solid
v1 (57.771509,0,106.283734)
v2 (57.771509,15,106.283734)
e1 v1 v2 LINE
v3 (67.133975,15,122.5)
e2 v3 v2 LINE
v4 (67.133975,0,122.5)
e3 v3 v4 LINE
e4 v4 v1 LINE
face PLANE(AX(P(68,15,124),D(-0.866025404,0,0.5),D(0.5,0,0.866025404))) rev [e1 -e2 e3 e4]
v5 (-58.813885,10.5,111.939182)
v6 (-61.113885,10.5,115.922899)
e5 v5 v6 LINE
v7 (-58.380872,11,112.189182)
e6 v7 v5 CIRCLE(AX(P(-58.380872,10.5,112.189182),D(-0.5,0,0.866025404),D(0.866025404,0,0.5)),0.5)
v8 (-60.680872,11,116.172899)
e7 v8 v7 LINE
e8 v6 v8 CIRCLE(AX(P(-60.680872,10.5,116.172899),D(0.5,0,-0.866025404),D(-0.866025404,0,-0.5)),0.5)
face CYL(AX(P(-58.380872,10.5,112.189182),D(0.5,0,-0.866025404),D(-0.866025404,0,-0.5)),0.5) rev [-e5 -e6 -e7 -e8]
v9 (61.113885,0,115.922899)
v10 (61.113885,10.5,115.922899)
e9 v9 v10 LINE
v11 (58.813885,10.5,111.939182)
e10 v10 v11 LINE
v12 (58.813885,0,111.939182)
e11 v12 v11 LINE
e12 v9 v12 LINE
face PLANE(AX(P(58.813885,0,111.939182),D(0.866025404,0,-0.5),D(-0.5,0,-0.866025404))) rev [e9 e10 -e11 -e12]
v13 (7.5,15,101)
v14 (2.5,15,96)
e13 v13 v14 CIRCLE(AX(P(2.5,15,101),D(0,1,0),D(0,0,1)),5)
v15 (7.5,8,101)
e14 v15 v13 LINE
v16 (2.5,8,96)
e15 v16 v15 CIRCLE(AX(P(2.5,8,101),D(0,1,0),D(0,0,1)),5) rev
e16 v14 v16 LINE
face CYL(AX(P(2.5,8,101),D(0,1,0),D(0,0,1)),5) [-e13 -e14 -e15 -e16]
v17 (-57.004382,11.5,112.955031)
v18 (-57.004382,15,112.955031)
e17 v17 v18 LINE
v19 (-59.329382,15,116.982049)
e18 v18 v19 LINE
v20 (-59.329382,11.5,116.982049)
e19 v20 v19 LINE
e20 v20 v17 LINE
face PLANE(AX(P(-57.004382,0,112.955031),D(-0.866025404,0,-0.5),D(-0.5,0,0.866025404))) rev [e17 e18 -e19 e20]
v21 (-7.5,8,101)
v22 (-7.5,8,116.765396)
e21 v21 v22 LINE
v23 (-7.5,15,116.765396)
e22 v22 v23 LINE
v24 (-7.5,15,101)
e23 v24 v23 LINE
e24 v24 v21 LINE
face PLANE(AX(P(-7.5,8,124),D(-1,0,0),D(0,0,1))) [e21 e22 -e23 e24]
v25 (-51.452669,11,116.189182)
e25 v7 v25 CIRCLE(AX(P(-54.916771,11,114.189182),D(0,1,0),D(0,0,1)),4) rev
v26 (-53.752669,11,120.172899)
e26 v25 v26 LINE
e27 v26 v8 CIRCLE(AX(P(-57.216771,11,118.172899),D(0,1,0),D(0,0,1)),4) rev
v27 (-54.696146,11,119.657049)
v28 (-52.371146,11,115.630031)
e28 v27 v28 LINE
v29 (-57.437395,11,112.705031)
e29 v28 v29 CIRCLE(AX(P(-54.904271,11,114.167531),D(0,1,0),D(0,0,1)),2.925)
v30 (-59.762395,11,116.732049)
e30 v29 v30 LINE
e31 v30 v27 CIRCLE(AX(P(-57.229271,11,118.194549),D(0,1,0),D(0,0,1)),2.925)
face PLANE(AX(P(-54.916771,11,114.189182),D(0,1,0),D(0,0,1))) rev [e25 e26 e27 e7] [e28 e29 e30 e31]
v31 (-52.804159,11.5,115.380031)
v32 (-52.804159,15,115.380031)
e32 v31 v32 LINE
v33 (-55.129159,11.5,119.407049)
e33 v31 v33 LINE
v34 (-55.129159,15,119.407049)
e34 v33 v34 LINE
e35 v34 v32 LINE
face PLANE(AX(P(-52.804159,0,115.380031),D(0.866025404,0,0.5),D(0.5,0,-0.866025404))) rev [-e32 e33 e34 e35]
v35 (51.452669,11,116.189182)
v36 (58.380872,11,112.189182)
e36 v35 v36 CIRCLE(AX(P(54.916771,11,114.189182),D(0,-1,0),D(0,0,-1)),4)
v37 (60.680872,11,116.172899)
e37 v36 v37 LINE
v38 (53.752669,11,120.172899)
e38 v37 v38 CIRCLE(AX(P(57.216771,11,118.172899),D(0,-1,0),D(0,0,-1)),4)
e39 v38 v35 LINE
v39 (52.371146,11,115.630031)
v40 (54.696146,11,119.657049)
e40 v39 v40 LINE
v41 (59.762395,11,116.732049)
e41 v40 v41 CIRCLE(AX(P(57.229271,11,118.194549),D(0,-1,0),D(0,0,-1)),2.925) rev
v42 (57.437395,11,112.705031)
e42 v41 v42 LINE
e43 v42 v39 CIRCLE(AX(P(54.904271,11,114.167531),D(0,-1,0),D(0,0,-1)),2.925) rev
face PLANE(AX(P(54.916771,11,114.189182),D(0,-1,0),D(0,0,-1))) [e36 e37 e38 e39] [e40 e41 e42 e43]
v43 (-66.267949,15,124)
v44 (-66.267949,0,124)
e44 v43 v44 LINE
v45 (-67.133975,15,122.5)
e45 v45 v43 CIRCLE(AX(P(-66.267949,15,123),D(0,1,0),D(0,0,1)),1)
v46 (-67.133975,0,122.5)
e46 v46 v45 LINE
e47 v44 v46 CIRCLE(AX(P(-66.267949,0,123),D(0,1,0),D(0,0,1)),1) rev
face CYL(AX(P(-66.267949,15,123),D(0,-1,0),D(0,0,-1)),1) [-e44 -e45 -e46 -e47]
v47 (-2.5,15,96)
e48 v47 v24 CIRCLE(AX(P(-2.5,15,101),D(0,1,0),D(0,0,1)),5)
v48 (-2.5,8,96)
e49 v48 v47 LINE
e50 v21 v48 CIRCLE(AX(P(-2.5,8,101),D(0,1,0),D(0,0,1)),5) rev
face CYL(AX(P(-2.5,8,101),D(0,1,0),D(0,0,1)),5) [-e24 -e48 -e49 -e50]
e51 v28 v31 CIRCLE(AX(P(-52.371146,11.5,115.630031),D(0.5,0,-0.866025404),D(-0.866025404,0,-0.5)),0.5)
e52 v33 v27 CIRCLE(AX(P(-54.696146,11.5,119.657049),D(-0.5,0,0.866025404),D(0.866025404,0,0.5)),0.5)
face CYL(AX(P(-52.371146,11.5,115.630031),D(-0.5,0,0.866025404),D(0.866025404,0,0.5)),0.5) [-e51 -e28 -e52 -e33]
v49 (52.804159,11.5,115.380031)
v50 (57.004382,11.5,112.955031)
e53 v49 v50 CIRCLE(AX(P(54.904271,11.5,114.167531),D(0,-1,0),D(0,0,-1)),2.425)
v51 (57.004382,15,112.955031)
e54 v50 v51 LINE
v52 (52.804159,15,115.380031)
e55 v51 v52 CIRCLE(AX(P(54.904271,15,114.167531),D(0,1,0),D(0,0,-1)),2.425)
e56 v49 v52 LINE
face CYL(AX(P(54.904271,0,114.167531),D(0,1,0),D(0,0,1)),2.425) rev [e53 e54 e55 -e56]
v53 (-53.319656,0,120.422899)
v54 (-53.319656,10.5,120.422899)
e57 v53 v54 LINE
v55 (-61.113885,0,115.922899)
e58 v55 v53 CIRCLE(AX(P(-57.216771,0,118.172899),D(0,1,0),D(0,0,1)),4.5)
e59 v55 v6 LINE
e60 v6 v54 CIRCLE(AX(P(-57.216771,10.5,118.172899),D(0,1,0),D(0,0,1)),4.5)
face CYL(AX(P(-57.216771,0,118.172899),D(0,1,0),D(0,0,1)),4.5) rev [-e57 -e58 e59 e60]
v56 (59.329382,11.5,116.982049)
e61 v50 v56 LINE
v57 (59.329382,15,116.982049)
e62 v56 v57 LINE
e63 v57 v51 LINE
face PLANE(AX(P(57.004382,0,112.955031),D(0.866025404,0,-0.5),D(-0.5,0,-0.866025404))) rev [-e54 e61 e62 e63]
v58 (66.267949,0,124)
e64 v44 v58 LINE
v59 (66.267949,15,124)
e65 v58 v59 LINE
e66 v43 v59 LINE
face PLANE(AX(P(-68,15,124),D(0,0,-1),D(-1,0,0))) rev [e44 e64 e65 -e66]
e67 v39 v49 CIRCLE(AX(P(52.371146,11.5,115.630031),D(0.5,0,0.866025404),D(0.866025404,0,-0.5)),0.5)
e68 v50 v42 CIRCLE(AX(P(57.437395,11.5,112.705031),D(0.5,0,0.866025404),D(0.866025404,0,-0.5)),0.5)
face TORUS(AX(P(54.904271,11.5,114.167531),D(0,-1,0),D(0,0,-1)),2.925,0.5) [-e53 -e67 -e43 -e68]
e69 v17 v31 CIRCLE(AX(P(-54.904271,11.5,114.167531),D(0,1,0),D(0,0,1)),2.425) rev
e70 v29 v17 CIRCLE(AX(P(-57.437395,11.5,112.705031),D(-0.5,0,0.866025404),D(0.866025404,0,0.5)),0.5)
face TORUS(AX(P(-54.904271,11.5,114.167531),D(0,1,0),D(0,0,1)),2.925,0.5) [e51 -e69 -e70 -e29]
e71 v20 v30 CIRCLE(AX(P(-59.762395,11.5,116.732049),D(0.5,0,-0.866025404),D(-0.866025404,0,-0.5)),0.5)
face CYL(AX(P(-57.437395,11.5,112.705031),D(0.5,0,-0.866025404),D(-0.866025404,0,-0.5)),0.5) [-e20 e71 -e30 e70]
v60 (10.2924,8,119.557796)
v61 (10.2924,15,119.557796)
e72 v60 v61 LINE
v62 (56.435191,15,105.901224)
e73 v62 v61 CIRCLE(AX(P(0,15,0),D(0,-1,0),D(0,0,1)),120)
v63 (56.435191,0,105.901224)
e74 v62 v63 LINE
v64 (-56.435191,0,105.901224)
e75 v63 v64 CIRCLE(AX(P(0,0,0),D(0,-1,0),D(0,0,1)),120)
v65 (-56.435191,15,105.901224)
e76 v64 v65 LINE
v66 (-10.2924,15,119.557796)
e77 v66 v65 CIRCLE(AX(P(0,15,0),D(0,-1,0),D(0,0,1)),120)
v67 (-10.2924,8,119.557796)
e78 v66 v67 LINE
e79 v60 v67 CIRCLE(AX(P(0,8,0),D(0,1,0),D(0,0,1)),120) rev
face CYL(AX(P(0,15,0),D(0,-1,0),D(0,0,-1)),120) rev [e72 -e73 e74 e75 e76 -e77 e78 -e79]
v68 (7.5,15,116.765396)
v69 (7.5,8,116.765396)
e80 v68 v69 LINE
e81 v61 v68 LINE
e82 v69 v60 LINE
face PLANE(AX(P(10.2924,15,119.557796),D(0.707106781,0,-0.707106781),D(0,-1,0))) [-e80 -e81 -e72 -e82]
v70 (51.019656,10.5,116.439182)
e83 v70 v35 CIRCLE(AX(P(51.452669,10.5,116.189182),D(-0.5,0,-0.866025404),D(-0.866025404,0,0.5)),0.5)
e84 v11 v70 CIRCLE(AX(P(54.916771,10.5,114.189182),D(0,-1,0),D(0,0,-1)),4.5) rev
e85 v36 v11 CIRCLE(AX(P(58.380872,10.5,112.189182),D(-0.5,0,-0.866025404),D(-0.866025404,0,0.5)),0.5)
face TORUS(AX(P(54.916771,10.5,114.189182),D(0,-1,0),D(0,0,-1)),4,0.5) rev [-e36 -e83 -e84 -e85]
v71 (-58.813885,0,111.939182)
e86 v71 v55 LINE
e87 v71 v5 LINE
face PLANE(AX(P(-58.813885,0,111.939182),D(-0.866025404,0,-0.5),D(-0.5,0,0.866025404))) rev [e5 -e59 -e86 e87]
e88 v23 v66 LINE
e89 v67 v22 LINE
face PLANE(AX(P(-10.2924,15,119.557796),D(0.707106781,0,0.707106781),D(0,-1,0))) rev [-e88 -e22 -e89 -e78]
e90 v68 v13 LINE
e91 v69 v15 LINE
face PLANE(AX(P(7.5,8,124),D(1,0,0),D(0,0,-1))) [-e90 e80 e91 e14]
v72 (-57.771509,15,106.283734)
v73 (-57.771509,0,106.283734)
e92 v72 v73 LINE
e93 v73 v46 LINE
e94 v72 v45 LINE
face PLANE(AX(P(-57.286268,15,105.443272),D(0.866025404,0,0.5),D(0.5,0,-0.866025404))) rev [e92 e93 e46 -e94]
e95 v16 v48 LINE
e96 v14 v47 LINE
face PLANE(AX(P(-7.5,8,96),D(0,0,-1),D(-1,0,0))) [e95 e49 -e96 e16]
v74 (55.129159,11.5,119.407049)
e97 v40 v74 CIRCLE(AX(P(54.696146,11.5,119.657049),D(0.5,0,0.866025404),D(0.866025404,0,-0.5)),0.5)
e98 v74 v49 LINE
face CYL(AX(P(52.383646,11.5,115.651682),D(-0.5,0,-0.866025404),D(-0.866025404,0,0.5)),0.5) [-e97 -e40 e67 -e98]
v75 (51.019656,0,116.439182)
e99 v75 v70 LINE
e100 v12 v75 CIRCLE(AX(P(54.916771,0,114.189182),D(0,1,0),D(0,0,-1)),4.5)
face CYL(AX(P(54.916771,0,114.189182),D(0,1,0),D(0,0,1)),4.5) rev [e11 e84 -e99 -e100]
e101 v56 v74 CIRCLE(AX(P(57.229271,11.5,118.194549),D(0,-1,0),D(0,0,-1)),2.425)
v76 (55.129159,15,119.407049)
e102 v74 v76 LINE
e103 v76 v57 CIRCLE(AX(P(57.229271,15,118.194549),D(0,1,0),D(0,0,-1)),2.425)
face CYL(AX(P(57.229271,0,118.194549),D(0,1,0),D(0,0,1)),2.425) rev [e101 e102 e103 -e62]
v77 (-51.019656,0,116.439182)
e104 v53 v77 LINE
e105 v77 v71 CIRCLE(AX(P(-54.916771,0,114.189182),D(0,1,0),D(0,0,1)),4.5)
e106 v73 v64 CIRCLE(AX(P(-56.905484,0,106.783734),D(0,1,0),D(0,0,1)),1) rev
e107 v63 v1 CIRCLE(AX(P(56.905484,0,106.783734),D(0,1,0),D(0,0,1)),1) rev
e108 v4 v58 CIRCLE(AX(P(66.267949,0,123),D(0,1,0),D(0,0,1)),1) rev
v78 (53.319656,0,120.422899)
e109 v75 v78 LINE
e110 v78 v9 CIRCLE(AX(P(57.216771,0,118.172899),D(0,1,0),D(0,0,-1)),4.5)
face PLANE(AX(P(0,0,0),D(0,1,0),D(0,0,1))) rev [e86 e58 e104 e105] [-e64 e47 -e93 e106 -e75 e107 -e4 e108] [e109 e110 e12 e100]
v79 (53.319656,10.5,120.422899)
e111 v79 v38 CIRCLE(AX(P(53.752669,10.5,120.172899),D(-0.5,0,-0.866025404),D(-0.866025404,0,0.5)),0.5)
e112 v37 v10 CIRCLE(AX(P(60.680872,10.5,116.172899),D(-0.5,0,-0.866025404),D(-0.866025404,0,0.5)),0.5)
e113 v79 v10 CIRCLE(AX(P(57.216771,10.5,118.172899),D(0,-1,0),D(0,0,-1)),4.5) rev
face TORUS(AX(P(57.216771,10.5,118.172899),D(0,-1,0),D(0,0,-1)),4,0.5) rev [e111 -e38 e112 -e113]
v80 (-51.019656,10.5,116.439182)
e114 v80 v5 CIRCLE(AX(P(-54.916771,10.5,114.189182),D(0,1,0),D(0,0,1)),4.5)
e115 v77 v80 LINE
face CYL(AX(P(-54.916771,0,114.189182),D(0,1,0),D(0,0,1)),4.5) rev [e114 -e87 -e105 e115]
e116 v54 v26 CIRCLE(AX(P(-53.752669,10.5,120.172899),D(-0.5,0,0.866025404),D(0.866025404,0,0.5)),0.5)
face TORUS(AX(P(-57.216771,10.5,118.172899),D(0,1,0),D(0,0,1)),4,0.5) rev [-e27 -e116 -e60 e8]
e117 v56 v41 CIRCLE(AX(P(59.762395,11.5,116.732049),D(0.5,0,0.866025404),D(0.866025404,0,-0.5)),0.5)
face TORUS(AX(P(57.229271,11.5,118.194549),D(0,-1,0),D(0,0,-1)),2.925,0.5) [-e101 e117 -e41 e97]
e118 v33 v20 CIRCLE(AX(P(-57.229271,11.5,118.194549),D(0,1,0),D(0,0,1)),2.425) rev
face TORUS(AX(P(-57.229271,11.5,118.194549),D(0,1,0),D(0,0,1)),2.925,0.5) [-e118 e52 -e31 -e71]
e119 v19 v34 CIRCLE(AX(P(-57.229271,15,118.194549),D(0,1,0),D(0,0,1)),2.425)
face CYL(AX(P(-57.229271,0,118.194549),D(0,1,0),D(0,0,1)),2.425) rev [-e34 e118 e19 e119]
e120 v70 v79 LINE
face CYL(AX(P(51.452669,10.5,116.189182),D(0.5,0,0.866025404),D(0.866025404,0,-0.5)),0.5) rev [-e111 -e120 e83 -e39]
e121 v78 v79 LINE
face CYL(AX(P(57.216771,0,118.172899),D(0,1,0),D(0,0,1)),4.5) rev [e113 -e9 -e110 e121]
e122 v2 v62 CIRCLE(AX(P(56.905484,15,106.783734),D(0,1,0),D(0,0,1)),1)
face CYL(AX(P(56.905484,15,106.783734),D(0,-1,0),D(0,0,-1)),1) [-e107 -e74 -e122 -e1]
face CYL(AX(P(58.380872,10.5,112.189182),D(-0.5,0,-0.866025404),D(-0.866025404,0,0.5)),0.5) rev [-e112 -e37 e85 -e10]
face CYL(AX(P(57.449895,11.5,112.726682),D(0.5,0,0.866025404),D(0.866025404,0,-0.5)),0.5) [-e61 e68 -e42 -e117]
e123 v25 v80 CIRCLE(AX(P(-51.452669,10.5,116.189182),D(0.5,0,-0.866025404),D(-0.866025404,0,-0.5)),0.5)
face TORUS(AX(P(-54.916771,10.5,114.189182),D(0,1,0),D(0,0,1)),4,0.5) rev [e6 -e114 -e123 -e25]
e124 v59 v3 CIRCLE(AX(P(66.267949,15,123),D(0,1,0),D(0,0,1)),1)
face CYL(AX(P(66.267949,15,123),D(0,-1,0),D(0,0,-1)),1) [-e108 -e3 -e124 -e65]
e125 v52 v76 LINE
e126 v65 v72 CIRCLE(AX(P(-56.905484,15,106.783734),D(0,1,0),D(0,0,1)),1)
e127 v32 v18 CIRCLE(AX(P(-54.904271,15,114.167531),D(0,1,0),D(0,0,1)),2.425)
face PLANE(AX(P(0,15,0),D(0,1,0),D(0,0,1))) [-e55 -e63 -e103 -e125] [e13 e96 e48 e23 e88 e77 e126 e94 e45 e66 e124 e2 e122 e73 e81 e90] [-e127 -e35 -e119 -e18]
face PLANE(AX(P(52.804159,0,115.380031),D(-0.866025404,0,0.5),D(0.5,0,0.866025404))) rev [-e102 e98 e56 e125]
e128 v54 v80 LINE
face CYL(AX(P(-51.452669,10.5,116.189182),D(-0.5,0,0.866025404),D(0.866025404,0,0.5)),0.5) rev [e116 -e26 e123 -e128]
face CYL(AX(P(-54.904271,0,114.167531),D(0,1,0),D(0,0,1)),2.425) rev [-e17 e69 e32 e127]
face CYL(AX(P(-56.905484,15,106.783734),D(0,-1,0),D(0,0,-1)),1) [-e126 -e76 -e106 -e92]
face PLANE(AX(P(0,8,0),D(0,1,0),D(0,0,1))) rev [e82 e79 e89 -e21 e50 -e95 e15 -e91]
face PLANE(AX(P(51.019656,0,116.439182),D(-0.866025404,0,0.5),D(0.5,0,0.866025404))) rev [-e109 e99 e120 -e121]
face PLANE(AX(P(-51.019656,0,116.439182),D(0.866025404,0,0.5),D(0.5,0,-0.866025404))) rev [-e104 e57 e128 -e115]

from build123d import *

# Parameters (mm, degrees)
BOSS_EXTRUDE1_DEPTH = 15
CUT_EXTRUDE1_DEPTH  = 143.214626533
CUT_EXTRUDE3_START  = -4
CUT_EXTRUDE3_DEPTH  = 139.214626533
FILLET1_R           = 1
FILLET2_R           = 0.5
SKETCH4_W           = 15
SKETCH4_H           = 28
BOSS_EXTRUDE2_DEPTH = 7
CHAMFER1_SIZE       = 3
FILLET3_R           = 5


with BuildPart() as part:
    # Sketch1 → Boss-Extrude1 (new body)
    with BuildSketch(Plane(origin=(0, 0, 0), x_dir=(1, 0, 0), z_dir=(0, 1, 0))):
        with BuildLine():
            Line((-57.286267839, -105.443271559), (-68, -124))
            Line((-68, -124), (68, -124))
            Line((68, -124), (57.286267839, -105.443271559))
            ThreePointArc((57.286267839, -105.443271559), (0, -120), (-57.286267839, -105.443271559))
        make_face()
    extrude(amount=BOSS_EXTRUDE1_DEPTH)

    # Sketch2 → Cut-Extrude1 (cut, through all)
    with BuildSketch(Plane(origin=(0, 15, 0), x_dir=(1, 0, 0), z_dir=(0, 1, 0))):
        with BuildLine():
            Line((-52.804159001, -115.380031326), (-55.129159001, -119.407049454))
            ThreePointArc((-55.129159001, -119.407049454), (-58.441770605, -120.294661058), (-59.32938221, -116.982049454))
            Line((-59.32938221, -116.982049454), (-57.00438221, -112.955031326))
            ThreePointArc((-57.00438221, -112.955031326), (-53.691770605, -112.067419722), (-52.804159001, -115.380031326))
        make_face()
        with BuildLine():
            Line((52.804159001, -115.380031326), (55.129159001, -119.407049454))
            ThreePointArc((55.129159001, -119.407049454), (58.441770605, -120.294661058), (59.32938221, -116.982049454))
            Line((59.32938221, -116.982049454), (57.00438221, -112.955031326))
            ThreePointArc((57.00438221, -112.955031326), (53.691770605, -112.067419722), (52.804159001, -115.380031326))
        make_face()
    extrude(amount=-CUT_EXTRUDE1_DEPTH, mode=Mode.SUBTRACT)

    # Sketch3 → Cut-Extrude3 (cut, through all)
    with BuildSketch(Plane(origin=(0, 15, 0), x_dir=(1, 0, 0), z_dir=(0, 1, 0)).offset(CUT_EXTRUDE3_START)):
        with BuildLine():
            Line((-51.019656288, -116.439181962), (-53.319656288, -120.422898819))
            ThreePointArc((-53.319656288, -120.422898819), (-59.466770605, -122.070013136), (-61.113884922, -115.922898819))
            Line((-61.113884922, -115.922898819), (-58.813884922, -111.939181962))
            ThreePointArc((-58.813884922, -111.939181962), (-52.666770605, -110.292067644), (-51.019656288, -116.439181962))
        make_face()
        with BuildLine():
            Line((51.019656288, -116.439181962), (53.319656288, -120.422898819))
            ThreePointArc((53.319656288, -120.422898819), (59.466770605, -122.070013136), (61.113884922, -115.922898819))
            Line((61.113884922, -115.922898819), (58.813884922, -111.939181962))
            ThreePointArc((58.813884922, -111.939181962), (52.666770605, -110.292067644), (51.019656288, -116.439181962))
        make_face()
    extrude(amount=-CUT_EXTRUDE3_DEPTH, mode=Mode.SUBTRACT)

    # Fillet1
    fillet1_edges = [part.edges().sort_by_distance(p)[0] for p in [
        (57.286267839, 7.5, 105.443271559),
        (68, 7.5, 124),
        (-68, 7.5, 124),
        (-57.286267839, 7.5, 105.443271559),
    ]]
    fillet(fillet1_edges, radius=FILLET1_R)

    # Fillet2
    fillet2_edges = [part.edges().sort_by_distance(p)[0] for p in [
        (-58.16688221, 11, 114.96854039),
        (53.966659001, 11, 117.39354039),
        (-52.666770605, 11, 110.292067644),
        (-59.963884922, 11, 113.93104039),
        (-59.466770605, 11, 122.070013136),
        (-52.169656288, 11, 118.43104039),
        (-53.691770605, 11, 112.067419722),
        (-53.966659001, 11, 117.39354039),
        (-58.441770605, 11, 120.294661058),
        (52.666770605, 11, 110.292067644),
        (52.169656288, 11, 118.43104039),
        (59.466770605, 11, 122.070013136),
        (59.963884922, 11, 113.93104039),
        (58.16688221, 11, 114.96854039),
        (53.691770605, 11, 112.067419722),
        (58.441770605, 11, 120.294661058),
    ]]
    fillet(fillet2_edges, radius=FILLET2_R)

    # Sketch4 → Boss-Extrude2 (add)
    with BuildSketch(Plane(origin=(0, 15, 0), x_dir=(1, 0, 0), z_dir=(0, 1, 0))):
        with Locations((0, -110)):
            Rectangle(SKETCH4_W, SKETCH4_H)
    extrude(amount=-BOSS_EXTRUDE2_DEPTH)

    # Chamfer1
    # the kernel refuses this chamfer: 3, 2.828734379 mm, written as the material it adds along each edge
    with BuildSketch(Plane(origin=(-7.5, 15, 119.76539567), x_dir=(0, 0, -1), z_dir=(0, -1, 0))) as chamfer1_piece_1:
        with BuildLine():
            Line((CHAMFER1_SIZE, 0), (0.207600012, -2.792399988))
            ThreePointArc((0.207600012, -2.792399988), (0.098564019, -1.43584929), (0, 0))
            Line((0, 0), (CHAMFER1_SIZE, 0))
        make_face()
    extrude(amount=7)
    with BuildSketch(Plane(origin=(7.5, 15, 119.76539567), x_dir=(0, 0, -1), z_dir=(0, -1, 0))) as chamfer1_piece_2:
        with BuildLine():
            Line((CHAMFER1_SIZE, 0), (0.207600012, 2.792399988))
            ThreePointArc((0.207600012, 2.792399988), (0.098564019, 1.43584929), (0, 0))
            Line((0, 0), (CHAMFER1_SIZE, 0))
        make_face()
    extrude(amount=7)

    # Fillet3
    fillet3_edges = [part.edges().sort_by_distance(p)[0] for p in [
        (7.5, 11.5, 96),
        (-7.5, 11.5, 96),
    ]]
    fillet(fillet3_edges, radius=FILLET3_R)


solid = part.part
